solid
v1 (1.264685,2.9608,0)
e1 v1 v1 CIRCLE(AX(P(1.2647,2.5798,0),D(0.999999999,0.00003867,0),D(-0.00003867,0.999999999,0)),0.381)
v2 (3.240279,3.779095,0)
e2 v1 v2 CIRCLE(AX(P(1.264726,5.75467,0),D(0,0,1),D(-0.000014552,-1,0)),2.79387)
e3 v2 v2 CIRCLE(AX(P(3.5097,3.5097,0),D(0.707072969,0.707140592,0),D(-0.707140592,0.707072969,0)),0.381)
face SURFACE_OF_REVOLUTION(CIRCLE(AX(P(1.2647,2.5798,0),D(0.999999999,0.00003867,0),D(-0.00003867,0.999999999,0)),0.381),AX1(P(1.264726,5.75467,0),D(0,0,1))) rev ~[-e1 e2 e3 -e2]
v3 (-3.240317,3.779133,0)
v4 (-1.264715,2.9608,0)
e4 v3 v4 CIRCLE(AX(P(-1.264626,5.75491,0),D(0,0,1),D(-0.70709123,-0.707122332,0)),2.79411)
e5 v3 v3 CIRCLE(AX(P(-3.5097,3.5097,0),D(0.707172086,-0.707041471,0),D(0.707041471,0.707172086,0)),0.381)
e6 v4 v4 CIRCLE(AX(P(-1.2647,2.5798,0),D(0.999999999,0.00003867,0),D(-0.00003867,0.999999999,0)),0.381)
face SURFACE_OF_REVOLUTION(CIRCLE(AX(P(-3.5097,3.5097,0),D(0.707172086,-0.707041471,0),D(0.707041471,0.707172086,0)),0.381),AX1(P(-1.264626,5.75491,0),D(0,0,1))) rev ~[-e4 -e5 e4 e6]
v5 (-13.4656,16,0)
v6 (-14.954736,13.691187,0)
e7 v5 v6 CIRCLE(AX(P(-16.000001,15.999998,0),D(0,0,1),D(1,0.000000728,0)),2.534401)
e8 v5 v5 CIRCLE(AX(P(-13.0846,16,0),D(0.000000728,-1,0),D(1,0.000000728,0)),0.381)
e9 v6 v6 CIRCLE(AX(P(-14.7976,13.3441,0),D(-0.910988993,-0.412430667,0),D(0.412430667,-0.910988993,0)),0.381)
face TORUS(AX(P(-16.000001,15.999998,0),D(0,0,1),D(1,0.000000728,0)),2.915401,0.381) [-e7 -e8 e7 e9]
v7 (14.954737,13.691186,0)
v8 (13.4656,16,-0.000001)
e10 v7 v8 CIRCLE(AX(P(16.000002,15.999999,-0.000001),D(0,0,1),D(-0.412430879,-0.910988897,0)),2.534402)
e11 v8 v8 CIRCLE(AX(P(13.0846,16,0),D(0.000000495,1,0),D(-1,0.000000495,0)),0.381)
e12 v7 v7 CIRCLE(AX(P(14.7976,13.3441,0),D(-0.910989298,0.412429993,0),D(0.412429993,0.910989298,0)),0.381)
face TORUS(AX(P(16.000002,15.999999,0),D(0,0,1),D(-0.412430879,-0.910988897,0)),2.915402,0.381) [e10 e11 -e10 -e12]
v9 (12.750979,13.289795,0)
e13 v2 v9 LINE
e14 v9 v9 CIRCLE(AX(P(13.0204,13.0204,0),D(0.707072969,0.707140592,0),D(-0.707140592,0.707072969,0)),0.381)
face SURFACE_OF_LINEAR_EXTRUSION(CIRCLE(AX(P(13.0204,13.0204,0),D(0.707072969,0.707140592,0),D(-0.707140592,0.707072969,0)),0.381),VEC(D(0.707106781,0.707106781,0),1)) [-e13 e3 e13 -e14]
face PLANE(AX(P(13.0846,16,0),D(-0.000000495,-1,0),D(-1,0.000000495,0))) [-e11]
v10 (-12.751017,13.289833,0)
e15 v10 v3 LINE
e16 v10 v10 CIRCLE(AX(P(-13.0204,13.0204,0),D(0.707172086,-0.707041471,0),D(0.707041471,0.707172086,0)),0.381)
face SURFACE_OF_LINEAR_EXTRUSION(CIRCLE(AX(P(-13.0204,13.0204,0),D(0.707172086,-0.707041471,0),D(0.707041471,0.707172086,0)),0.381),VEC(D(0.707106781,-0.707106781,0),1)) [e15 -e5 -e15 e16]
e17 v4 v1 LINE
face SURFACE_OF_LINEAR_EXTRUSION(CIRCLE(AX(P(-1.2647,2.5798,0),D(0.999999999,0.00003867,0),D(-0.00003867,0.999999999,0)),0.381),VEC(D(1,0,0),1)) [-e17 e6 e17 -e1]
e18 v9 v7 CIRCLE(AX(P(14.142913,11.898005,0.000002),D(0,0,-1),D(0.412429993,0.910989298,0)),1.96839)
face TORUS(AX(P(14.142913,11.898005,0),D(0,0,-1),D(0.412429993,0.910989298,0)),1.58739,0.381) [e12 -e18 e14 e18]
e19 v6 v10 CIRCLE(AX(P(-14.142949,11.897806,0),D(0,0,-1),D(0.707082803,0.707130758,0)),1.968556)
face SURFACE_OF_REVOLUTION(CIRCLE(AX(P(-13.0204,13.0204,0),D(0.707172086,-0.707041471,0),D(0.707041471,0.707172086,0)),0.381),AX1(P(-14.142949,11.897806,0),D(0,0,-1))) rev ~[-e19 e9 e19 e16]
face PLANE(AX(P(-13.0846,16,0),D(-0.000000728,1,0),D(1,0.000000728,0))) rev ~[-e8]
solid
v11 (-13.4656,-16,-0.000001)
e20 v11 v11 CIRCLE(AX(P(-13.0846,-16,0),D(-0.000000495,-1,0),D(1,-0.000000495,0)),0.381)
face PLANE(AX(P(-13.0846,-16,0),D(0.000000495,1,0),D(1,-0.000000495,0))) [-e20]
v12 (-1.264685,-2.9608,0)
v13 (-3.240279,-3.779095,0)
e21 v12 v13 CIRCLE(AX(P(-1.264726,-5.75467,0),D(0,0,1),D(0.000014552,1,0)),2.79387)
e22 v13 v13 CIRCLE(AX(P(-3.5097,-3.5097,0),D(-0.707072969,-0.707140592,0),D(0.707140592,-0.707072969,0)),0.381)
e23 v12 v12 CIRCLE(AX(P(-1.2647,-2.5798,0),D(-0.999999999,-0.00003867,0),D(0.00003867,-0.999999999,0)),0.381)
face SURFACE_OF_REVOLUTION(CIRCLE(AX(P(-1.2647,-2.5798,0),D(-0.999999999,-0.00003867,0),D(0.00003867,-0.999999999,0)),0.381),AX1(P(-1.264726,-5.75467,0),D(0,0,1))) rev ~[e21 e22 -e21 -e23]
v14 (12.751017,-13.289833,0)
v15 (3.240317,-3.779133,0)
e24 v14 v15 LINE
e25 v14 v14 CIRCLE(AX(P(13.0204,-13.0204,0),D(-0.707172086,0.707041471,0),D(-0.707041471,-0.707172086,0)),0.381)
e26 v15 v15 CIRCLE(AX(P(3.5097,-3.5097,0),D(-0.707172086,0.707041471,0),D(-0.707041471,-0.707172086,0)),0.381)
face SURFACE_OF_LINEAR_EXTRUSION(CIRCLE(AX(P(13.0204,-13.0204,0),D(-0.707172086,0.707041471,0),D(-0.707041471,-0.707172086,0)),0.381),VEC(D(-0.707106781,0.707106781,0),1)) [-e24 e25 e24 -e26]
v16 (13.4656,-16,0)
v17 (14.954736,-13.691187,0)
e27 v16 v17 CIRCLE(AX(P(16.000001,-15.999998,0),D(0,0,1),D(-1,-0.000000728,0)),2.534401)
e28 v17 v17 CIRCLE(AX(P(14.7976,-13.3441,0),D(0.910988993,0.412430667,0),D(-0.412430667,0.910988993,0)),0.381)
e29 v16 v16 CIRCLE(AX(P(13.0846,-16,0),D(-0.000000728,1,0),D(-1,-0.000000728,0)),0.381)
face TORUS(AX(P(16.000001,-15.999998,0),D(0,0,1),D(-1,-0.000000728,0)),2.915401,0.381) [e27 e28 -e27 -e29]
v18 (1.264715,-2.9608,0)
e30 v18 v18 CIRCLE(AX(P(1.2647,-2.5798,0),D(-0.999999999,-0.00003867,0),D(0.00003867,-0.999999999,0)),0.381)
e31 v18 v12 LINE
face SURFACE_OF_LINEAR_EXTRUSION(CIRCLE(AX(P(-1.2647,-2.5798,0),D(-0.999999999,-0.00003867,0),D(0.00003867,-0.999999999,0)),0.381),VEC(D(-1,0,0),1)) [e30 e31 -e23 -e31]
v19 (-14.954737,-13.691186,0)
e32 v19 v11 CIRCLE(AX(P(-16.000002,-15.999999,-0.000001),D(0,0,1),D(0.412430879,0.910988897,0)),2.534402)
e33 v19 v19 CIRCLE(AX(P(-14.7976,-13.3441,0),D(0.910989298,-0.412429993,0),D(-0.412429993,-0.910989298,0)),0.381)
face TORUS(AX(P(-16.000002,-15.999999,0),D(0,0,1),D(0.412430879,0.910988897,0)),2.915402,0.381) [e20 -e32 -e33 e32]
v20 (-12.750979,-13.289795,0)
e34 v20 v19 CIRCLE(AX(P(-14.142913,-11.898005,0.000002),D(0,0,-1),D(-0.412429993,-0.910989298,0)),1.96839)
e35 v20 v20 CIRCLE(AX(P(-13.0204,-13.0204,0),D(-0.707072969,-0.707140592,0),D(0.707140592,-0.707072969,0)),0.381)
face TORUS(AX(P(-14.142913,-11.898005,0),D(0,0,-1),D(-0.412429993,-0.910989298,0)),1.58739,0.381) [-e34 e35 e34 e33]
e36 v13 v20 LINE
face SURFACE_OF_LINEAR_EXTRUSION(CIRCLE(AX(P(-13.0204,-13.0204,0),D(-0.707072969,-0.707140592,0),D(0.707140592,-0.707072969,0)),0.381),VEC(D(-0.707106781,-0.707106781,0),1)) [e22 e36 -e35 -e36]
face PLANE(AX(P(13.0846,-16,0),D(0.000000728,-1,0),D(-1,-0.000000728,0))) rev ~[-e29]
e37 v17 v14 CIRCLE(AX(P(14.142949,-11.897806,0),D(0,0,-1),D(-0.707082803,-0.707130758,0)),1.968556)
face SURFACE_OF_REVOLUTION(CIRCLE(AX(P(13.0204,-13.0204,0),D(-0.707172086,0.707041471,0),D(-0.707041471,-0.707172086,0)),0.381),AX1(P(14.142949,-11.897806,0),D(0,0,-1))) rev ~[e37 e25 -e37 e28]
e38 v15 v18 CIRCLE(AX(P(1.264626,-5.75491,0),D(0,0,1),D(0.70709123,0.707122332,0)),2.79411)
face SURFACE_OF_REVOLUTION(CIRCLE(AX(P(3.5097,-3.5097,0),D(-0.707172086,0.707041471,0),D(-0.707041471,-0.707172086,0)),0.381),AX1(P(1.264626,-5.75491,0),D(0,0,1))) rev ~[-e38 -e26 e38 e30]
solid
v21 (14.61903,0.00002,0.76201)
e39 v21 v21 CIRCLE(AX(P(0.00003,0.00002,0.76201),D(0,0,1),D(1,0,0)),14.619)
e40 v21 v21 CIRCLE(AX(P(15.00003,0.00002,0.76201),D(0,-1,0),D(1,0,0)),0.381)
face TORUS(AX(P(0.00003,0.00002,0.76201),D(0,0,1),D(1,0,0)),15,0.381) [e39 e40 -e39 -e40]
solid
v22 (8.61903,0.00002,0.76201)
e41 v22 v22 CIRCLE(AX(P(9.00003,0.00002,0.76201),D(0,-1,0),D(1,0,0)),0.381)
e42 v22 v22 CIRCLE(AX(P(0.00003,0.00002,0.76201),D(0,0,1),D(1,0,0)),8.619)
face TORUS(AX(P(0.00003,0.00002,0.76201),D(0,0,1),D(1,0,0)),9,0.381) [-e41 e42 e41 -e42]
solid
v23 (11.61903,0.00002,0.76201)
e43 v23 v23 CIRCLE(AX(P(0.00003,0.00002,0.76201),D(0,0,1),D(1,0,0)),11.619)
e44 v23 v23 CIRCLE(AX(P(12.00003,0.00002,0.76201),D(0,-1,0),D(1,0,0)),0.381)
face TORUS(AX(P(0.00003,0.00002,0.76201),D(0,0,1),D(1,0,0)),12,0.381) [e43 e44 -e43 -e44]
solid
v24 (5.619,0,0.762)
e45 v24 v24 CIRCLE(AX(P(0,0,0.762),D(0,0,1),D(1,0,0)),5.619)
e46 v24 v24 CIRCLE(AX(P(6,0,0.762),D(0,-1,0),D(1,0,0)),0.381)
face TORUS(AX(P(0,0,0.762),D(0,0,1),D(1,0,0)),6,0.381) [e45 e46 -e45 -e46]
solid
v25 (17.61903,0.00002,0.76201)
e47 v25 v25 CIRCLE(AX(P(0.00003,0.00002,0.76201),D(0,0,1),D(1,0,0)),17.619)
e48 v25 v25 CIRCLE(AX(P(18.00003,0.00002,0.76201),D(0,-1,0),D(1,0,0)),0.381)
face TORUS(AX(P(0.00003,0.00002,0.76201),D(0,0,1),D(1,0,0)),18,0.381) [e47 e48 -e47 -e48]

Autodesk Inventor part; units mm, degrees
sketch "Sketch1" plane through (0, 0, 0) normal (0, 0, 1) x (1, 0, 0)
  arc A0 (-13.0846, 16) -> (-14.7976, 13.3441) centre (-16, 16) ccw
  line L0 (-13.0204, 13.0204) -> (-3.5097, 3.5097)
  line L1 (-1.2647, 2.5798) -> (1.2647, 2.5798)
  arc A1 (-3.5097, 3.5097) -> (-1.2647, 2.5798) centre (-1.2647, 5.7548) ccw
  arc A2 (-13.0204, 13.0204) -> (-14.7976, 13.3441) centre (-14.1429, 11.8979) ccw
  arc A3 (14.7976, 13.3441) -> (13.0846, 16) centre (16, 16) ccw
  line L2 (13.0204, 13.0204) -> (3.5097, 3.5097)
  arc A4 (14.7976, 13.3441) -> (13.0204, 13.0204) centre (14.1429, 11.8979) ccw
  arc A5 (1.2647, 2.5798) -> (3.5097, 3.5097) centre (1.2647, 5.7548) ccw
  line L3 (0, 0) -> (0, 12.1391)
  dimension "d0" = 3.175
  dimension "d1" = 3.175
  dimension "d10" = 2.9154
  dimension "d11" = 32
  dimension "d13" = 2.5798
ref_plane "Work Plane1" through (-13.0846, 16, 0) normal (0, 1, 0) x (-1, 0, 0)
sketch "Sketch2" plane through (-13.0846, 16, 0) normal (0, 1, 0) x (-1, 0, 0)
  circle A0 centre (0, 0) radius 0.381
  dimension "d2" = 0.762
sweep "Sweep1" add profiles "Sketch2" path "Sketch1" path curves A0 A2 L0 A1 L1 A5 L2 A4 A3
sketch "Sketch4" plane through (0, 0, 0) normal (0, 0, 1) x (1, 0, 0)
  line L0 (-1.2647, -2.5798) -> (1.2647, -2.5798)
  arc A0 (3.5097, -3.5097) -> (1.2647, -2.5798) centre (1.2647, -5.7548) ccw
  line L1 (13.0204, -13.0204) -> (3.5097, -3.5097)
  arc A1 (13.0846, -16) -> (14.7976, -13.3441) centre (16, -16) ccw
  arc A2 (13.0204, -13.0204) -> (14.7976, -13.3441) centre (14.1429, -11.8979) ccw
  line L2 (0, 0) -> (0, -10.7959)
  arc A3 (-1.2647, -2.5798) -> (-3.5097, -3.5097) centre (-1.2647, -5.7548) ccw
  line L3 (-13.0204, -13.0204) -> (-3.5097, -3.5097)
  arc A4 (-14.7976, -13.3441) -> (-13.0204, -13.0204) centre (-14.1429, -11.8979) ccw
  arc A5 (-14.7976, -13.3441) -> (-13.0846, -16) centre (-16, -16) ccw
  dimension "d14" = 2.9154
  dimension "d15" = 1.5875
  dimension "d16" = 3.175
  dimension "d17" = 2.5798
ref_plane "Work Plane3" through (13.0846, -16, 0) normal (0, -1, 0) x (1, 0, 0)
sketch "Sketch5" plane through (13.0846, -16, 0) normal (0, -1, 0) x (1, 0, 0)
  circle A0 centre (0, 0) radius 0.381
  dimension "d7" = 0.762
sweep "Sweep2" add profiles "Sketch5" path "Sketch4" path curves A1 A2 L1 A0 L0 A3 L3 A4 A5
ref_plane "Work Plane4" through (0, 0, 0.762) normal (0, 0, 1) x (1, 0, 0)
sketch "Sketch6" plane through (0, 0, 0.762) normal (0, 0, 1) x (1, 0, 0)
  circle A0 centre (0, 0) radius 18
  dimension "d18" = 36
sketch "Sketch7" plane through (0, 0, 0.762) normal (0, 0, 1) x (1, 0, 0)
  circle A0 centre (0, 0) radius 15
  dimension "d19" = 30
sketch "Sketch8" plane through (0, 0, 0.762) normal (0, 0, 1) x (1, 0, 0)
  circle A0 centre (0, 0) radius 12
  dimension "d20" = 24
sketch "Sketch9" plane through (0, 0, 0.762) normal (0, 0, 1) x (1, 0, 0)
  circle A0 centre (0, 0) radius 9
  dimension "d21" = 18
sketch "Sketch10" plane through (0, 0, 0.762) normal (0, 0, 1) x (1, 0, 0)
  circle A0 centre (0, 0) radius 6
  dimension "d22" = 12
sketch "Sketch11" plane through (0, 0, 0) normal (0, 1, 0) x (-1, 0, 0)
  line L0 (18, 0.762) -> (-18, 0.762) projected
  circle A0 centre (-18, 0.762) radius 0.381
  point P0 (0, 0)
  dimension "d23" = 0.762
sketch "Sketch12" plane through (0, 0, 0) normal (0, 1, 0) x (-1, 0, 0)
  line L0 (15, 0.762) -> (-15, 0.762) projected
  circle A0 centre (-15, 0.762) radius 0.381
  dimension "d24" = 0.762
sketch "Sketch13" plane through (0, 0, 0) normal (0, 1, 0) x (-1, 0, 0)
  line L0 (12, 0.762) -> (-12, 0.762) projected
  circle A0 centre (-12, 0.762) radius 0.381
  dimension "d25" = 0.762
sketch "Sketch14" plane through (0, 0, 0) normal (0, 1, 0) x (-1, 0, 0)
  line L0 (9, 0.762) -> (-9, 0.762) projected
  circle A0 centre (-9, 0.762) radius 0.381
  dimension "d26" = 0.762
sketch "Sketch15" plane through (0, 0, 0) normal (0, 1, 0) x (-1, 0, 0)
  line L0 (6, 0.762) -> (-6, 0.762) projected
  circle A0 centre (-6, 0.762) radius 0.381
  dimension "d27" = 0.762
sweep "Sweep3" add profiles "Sketch11" path "Sketch6"
sweep "Sweep4" add profiles "Sketch12" path "Sketch7"
sweep "Sweep5" add profiles "Sketch13" path "Sketch8"
sweep "Sweep6" add profiles "Sketch14" path "Sketch9"
sweep "Sweep7" add profiles "Sketch15" path "Sketch10"
properties part number "Fan Guard, 40mm"
